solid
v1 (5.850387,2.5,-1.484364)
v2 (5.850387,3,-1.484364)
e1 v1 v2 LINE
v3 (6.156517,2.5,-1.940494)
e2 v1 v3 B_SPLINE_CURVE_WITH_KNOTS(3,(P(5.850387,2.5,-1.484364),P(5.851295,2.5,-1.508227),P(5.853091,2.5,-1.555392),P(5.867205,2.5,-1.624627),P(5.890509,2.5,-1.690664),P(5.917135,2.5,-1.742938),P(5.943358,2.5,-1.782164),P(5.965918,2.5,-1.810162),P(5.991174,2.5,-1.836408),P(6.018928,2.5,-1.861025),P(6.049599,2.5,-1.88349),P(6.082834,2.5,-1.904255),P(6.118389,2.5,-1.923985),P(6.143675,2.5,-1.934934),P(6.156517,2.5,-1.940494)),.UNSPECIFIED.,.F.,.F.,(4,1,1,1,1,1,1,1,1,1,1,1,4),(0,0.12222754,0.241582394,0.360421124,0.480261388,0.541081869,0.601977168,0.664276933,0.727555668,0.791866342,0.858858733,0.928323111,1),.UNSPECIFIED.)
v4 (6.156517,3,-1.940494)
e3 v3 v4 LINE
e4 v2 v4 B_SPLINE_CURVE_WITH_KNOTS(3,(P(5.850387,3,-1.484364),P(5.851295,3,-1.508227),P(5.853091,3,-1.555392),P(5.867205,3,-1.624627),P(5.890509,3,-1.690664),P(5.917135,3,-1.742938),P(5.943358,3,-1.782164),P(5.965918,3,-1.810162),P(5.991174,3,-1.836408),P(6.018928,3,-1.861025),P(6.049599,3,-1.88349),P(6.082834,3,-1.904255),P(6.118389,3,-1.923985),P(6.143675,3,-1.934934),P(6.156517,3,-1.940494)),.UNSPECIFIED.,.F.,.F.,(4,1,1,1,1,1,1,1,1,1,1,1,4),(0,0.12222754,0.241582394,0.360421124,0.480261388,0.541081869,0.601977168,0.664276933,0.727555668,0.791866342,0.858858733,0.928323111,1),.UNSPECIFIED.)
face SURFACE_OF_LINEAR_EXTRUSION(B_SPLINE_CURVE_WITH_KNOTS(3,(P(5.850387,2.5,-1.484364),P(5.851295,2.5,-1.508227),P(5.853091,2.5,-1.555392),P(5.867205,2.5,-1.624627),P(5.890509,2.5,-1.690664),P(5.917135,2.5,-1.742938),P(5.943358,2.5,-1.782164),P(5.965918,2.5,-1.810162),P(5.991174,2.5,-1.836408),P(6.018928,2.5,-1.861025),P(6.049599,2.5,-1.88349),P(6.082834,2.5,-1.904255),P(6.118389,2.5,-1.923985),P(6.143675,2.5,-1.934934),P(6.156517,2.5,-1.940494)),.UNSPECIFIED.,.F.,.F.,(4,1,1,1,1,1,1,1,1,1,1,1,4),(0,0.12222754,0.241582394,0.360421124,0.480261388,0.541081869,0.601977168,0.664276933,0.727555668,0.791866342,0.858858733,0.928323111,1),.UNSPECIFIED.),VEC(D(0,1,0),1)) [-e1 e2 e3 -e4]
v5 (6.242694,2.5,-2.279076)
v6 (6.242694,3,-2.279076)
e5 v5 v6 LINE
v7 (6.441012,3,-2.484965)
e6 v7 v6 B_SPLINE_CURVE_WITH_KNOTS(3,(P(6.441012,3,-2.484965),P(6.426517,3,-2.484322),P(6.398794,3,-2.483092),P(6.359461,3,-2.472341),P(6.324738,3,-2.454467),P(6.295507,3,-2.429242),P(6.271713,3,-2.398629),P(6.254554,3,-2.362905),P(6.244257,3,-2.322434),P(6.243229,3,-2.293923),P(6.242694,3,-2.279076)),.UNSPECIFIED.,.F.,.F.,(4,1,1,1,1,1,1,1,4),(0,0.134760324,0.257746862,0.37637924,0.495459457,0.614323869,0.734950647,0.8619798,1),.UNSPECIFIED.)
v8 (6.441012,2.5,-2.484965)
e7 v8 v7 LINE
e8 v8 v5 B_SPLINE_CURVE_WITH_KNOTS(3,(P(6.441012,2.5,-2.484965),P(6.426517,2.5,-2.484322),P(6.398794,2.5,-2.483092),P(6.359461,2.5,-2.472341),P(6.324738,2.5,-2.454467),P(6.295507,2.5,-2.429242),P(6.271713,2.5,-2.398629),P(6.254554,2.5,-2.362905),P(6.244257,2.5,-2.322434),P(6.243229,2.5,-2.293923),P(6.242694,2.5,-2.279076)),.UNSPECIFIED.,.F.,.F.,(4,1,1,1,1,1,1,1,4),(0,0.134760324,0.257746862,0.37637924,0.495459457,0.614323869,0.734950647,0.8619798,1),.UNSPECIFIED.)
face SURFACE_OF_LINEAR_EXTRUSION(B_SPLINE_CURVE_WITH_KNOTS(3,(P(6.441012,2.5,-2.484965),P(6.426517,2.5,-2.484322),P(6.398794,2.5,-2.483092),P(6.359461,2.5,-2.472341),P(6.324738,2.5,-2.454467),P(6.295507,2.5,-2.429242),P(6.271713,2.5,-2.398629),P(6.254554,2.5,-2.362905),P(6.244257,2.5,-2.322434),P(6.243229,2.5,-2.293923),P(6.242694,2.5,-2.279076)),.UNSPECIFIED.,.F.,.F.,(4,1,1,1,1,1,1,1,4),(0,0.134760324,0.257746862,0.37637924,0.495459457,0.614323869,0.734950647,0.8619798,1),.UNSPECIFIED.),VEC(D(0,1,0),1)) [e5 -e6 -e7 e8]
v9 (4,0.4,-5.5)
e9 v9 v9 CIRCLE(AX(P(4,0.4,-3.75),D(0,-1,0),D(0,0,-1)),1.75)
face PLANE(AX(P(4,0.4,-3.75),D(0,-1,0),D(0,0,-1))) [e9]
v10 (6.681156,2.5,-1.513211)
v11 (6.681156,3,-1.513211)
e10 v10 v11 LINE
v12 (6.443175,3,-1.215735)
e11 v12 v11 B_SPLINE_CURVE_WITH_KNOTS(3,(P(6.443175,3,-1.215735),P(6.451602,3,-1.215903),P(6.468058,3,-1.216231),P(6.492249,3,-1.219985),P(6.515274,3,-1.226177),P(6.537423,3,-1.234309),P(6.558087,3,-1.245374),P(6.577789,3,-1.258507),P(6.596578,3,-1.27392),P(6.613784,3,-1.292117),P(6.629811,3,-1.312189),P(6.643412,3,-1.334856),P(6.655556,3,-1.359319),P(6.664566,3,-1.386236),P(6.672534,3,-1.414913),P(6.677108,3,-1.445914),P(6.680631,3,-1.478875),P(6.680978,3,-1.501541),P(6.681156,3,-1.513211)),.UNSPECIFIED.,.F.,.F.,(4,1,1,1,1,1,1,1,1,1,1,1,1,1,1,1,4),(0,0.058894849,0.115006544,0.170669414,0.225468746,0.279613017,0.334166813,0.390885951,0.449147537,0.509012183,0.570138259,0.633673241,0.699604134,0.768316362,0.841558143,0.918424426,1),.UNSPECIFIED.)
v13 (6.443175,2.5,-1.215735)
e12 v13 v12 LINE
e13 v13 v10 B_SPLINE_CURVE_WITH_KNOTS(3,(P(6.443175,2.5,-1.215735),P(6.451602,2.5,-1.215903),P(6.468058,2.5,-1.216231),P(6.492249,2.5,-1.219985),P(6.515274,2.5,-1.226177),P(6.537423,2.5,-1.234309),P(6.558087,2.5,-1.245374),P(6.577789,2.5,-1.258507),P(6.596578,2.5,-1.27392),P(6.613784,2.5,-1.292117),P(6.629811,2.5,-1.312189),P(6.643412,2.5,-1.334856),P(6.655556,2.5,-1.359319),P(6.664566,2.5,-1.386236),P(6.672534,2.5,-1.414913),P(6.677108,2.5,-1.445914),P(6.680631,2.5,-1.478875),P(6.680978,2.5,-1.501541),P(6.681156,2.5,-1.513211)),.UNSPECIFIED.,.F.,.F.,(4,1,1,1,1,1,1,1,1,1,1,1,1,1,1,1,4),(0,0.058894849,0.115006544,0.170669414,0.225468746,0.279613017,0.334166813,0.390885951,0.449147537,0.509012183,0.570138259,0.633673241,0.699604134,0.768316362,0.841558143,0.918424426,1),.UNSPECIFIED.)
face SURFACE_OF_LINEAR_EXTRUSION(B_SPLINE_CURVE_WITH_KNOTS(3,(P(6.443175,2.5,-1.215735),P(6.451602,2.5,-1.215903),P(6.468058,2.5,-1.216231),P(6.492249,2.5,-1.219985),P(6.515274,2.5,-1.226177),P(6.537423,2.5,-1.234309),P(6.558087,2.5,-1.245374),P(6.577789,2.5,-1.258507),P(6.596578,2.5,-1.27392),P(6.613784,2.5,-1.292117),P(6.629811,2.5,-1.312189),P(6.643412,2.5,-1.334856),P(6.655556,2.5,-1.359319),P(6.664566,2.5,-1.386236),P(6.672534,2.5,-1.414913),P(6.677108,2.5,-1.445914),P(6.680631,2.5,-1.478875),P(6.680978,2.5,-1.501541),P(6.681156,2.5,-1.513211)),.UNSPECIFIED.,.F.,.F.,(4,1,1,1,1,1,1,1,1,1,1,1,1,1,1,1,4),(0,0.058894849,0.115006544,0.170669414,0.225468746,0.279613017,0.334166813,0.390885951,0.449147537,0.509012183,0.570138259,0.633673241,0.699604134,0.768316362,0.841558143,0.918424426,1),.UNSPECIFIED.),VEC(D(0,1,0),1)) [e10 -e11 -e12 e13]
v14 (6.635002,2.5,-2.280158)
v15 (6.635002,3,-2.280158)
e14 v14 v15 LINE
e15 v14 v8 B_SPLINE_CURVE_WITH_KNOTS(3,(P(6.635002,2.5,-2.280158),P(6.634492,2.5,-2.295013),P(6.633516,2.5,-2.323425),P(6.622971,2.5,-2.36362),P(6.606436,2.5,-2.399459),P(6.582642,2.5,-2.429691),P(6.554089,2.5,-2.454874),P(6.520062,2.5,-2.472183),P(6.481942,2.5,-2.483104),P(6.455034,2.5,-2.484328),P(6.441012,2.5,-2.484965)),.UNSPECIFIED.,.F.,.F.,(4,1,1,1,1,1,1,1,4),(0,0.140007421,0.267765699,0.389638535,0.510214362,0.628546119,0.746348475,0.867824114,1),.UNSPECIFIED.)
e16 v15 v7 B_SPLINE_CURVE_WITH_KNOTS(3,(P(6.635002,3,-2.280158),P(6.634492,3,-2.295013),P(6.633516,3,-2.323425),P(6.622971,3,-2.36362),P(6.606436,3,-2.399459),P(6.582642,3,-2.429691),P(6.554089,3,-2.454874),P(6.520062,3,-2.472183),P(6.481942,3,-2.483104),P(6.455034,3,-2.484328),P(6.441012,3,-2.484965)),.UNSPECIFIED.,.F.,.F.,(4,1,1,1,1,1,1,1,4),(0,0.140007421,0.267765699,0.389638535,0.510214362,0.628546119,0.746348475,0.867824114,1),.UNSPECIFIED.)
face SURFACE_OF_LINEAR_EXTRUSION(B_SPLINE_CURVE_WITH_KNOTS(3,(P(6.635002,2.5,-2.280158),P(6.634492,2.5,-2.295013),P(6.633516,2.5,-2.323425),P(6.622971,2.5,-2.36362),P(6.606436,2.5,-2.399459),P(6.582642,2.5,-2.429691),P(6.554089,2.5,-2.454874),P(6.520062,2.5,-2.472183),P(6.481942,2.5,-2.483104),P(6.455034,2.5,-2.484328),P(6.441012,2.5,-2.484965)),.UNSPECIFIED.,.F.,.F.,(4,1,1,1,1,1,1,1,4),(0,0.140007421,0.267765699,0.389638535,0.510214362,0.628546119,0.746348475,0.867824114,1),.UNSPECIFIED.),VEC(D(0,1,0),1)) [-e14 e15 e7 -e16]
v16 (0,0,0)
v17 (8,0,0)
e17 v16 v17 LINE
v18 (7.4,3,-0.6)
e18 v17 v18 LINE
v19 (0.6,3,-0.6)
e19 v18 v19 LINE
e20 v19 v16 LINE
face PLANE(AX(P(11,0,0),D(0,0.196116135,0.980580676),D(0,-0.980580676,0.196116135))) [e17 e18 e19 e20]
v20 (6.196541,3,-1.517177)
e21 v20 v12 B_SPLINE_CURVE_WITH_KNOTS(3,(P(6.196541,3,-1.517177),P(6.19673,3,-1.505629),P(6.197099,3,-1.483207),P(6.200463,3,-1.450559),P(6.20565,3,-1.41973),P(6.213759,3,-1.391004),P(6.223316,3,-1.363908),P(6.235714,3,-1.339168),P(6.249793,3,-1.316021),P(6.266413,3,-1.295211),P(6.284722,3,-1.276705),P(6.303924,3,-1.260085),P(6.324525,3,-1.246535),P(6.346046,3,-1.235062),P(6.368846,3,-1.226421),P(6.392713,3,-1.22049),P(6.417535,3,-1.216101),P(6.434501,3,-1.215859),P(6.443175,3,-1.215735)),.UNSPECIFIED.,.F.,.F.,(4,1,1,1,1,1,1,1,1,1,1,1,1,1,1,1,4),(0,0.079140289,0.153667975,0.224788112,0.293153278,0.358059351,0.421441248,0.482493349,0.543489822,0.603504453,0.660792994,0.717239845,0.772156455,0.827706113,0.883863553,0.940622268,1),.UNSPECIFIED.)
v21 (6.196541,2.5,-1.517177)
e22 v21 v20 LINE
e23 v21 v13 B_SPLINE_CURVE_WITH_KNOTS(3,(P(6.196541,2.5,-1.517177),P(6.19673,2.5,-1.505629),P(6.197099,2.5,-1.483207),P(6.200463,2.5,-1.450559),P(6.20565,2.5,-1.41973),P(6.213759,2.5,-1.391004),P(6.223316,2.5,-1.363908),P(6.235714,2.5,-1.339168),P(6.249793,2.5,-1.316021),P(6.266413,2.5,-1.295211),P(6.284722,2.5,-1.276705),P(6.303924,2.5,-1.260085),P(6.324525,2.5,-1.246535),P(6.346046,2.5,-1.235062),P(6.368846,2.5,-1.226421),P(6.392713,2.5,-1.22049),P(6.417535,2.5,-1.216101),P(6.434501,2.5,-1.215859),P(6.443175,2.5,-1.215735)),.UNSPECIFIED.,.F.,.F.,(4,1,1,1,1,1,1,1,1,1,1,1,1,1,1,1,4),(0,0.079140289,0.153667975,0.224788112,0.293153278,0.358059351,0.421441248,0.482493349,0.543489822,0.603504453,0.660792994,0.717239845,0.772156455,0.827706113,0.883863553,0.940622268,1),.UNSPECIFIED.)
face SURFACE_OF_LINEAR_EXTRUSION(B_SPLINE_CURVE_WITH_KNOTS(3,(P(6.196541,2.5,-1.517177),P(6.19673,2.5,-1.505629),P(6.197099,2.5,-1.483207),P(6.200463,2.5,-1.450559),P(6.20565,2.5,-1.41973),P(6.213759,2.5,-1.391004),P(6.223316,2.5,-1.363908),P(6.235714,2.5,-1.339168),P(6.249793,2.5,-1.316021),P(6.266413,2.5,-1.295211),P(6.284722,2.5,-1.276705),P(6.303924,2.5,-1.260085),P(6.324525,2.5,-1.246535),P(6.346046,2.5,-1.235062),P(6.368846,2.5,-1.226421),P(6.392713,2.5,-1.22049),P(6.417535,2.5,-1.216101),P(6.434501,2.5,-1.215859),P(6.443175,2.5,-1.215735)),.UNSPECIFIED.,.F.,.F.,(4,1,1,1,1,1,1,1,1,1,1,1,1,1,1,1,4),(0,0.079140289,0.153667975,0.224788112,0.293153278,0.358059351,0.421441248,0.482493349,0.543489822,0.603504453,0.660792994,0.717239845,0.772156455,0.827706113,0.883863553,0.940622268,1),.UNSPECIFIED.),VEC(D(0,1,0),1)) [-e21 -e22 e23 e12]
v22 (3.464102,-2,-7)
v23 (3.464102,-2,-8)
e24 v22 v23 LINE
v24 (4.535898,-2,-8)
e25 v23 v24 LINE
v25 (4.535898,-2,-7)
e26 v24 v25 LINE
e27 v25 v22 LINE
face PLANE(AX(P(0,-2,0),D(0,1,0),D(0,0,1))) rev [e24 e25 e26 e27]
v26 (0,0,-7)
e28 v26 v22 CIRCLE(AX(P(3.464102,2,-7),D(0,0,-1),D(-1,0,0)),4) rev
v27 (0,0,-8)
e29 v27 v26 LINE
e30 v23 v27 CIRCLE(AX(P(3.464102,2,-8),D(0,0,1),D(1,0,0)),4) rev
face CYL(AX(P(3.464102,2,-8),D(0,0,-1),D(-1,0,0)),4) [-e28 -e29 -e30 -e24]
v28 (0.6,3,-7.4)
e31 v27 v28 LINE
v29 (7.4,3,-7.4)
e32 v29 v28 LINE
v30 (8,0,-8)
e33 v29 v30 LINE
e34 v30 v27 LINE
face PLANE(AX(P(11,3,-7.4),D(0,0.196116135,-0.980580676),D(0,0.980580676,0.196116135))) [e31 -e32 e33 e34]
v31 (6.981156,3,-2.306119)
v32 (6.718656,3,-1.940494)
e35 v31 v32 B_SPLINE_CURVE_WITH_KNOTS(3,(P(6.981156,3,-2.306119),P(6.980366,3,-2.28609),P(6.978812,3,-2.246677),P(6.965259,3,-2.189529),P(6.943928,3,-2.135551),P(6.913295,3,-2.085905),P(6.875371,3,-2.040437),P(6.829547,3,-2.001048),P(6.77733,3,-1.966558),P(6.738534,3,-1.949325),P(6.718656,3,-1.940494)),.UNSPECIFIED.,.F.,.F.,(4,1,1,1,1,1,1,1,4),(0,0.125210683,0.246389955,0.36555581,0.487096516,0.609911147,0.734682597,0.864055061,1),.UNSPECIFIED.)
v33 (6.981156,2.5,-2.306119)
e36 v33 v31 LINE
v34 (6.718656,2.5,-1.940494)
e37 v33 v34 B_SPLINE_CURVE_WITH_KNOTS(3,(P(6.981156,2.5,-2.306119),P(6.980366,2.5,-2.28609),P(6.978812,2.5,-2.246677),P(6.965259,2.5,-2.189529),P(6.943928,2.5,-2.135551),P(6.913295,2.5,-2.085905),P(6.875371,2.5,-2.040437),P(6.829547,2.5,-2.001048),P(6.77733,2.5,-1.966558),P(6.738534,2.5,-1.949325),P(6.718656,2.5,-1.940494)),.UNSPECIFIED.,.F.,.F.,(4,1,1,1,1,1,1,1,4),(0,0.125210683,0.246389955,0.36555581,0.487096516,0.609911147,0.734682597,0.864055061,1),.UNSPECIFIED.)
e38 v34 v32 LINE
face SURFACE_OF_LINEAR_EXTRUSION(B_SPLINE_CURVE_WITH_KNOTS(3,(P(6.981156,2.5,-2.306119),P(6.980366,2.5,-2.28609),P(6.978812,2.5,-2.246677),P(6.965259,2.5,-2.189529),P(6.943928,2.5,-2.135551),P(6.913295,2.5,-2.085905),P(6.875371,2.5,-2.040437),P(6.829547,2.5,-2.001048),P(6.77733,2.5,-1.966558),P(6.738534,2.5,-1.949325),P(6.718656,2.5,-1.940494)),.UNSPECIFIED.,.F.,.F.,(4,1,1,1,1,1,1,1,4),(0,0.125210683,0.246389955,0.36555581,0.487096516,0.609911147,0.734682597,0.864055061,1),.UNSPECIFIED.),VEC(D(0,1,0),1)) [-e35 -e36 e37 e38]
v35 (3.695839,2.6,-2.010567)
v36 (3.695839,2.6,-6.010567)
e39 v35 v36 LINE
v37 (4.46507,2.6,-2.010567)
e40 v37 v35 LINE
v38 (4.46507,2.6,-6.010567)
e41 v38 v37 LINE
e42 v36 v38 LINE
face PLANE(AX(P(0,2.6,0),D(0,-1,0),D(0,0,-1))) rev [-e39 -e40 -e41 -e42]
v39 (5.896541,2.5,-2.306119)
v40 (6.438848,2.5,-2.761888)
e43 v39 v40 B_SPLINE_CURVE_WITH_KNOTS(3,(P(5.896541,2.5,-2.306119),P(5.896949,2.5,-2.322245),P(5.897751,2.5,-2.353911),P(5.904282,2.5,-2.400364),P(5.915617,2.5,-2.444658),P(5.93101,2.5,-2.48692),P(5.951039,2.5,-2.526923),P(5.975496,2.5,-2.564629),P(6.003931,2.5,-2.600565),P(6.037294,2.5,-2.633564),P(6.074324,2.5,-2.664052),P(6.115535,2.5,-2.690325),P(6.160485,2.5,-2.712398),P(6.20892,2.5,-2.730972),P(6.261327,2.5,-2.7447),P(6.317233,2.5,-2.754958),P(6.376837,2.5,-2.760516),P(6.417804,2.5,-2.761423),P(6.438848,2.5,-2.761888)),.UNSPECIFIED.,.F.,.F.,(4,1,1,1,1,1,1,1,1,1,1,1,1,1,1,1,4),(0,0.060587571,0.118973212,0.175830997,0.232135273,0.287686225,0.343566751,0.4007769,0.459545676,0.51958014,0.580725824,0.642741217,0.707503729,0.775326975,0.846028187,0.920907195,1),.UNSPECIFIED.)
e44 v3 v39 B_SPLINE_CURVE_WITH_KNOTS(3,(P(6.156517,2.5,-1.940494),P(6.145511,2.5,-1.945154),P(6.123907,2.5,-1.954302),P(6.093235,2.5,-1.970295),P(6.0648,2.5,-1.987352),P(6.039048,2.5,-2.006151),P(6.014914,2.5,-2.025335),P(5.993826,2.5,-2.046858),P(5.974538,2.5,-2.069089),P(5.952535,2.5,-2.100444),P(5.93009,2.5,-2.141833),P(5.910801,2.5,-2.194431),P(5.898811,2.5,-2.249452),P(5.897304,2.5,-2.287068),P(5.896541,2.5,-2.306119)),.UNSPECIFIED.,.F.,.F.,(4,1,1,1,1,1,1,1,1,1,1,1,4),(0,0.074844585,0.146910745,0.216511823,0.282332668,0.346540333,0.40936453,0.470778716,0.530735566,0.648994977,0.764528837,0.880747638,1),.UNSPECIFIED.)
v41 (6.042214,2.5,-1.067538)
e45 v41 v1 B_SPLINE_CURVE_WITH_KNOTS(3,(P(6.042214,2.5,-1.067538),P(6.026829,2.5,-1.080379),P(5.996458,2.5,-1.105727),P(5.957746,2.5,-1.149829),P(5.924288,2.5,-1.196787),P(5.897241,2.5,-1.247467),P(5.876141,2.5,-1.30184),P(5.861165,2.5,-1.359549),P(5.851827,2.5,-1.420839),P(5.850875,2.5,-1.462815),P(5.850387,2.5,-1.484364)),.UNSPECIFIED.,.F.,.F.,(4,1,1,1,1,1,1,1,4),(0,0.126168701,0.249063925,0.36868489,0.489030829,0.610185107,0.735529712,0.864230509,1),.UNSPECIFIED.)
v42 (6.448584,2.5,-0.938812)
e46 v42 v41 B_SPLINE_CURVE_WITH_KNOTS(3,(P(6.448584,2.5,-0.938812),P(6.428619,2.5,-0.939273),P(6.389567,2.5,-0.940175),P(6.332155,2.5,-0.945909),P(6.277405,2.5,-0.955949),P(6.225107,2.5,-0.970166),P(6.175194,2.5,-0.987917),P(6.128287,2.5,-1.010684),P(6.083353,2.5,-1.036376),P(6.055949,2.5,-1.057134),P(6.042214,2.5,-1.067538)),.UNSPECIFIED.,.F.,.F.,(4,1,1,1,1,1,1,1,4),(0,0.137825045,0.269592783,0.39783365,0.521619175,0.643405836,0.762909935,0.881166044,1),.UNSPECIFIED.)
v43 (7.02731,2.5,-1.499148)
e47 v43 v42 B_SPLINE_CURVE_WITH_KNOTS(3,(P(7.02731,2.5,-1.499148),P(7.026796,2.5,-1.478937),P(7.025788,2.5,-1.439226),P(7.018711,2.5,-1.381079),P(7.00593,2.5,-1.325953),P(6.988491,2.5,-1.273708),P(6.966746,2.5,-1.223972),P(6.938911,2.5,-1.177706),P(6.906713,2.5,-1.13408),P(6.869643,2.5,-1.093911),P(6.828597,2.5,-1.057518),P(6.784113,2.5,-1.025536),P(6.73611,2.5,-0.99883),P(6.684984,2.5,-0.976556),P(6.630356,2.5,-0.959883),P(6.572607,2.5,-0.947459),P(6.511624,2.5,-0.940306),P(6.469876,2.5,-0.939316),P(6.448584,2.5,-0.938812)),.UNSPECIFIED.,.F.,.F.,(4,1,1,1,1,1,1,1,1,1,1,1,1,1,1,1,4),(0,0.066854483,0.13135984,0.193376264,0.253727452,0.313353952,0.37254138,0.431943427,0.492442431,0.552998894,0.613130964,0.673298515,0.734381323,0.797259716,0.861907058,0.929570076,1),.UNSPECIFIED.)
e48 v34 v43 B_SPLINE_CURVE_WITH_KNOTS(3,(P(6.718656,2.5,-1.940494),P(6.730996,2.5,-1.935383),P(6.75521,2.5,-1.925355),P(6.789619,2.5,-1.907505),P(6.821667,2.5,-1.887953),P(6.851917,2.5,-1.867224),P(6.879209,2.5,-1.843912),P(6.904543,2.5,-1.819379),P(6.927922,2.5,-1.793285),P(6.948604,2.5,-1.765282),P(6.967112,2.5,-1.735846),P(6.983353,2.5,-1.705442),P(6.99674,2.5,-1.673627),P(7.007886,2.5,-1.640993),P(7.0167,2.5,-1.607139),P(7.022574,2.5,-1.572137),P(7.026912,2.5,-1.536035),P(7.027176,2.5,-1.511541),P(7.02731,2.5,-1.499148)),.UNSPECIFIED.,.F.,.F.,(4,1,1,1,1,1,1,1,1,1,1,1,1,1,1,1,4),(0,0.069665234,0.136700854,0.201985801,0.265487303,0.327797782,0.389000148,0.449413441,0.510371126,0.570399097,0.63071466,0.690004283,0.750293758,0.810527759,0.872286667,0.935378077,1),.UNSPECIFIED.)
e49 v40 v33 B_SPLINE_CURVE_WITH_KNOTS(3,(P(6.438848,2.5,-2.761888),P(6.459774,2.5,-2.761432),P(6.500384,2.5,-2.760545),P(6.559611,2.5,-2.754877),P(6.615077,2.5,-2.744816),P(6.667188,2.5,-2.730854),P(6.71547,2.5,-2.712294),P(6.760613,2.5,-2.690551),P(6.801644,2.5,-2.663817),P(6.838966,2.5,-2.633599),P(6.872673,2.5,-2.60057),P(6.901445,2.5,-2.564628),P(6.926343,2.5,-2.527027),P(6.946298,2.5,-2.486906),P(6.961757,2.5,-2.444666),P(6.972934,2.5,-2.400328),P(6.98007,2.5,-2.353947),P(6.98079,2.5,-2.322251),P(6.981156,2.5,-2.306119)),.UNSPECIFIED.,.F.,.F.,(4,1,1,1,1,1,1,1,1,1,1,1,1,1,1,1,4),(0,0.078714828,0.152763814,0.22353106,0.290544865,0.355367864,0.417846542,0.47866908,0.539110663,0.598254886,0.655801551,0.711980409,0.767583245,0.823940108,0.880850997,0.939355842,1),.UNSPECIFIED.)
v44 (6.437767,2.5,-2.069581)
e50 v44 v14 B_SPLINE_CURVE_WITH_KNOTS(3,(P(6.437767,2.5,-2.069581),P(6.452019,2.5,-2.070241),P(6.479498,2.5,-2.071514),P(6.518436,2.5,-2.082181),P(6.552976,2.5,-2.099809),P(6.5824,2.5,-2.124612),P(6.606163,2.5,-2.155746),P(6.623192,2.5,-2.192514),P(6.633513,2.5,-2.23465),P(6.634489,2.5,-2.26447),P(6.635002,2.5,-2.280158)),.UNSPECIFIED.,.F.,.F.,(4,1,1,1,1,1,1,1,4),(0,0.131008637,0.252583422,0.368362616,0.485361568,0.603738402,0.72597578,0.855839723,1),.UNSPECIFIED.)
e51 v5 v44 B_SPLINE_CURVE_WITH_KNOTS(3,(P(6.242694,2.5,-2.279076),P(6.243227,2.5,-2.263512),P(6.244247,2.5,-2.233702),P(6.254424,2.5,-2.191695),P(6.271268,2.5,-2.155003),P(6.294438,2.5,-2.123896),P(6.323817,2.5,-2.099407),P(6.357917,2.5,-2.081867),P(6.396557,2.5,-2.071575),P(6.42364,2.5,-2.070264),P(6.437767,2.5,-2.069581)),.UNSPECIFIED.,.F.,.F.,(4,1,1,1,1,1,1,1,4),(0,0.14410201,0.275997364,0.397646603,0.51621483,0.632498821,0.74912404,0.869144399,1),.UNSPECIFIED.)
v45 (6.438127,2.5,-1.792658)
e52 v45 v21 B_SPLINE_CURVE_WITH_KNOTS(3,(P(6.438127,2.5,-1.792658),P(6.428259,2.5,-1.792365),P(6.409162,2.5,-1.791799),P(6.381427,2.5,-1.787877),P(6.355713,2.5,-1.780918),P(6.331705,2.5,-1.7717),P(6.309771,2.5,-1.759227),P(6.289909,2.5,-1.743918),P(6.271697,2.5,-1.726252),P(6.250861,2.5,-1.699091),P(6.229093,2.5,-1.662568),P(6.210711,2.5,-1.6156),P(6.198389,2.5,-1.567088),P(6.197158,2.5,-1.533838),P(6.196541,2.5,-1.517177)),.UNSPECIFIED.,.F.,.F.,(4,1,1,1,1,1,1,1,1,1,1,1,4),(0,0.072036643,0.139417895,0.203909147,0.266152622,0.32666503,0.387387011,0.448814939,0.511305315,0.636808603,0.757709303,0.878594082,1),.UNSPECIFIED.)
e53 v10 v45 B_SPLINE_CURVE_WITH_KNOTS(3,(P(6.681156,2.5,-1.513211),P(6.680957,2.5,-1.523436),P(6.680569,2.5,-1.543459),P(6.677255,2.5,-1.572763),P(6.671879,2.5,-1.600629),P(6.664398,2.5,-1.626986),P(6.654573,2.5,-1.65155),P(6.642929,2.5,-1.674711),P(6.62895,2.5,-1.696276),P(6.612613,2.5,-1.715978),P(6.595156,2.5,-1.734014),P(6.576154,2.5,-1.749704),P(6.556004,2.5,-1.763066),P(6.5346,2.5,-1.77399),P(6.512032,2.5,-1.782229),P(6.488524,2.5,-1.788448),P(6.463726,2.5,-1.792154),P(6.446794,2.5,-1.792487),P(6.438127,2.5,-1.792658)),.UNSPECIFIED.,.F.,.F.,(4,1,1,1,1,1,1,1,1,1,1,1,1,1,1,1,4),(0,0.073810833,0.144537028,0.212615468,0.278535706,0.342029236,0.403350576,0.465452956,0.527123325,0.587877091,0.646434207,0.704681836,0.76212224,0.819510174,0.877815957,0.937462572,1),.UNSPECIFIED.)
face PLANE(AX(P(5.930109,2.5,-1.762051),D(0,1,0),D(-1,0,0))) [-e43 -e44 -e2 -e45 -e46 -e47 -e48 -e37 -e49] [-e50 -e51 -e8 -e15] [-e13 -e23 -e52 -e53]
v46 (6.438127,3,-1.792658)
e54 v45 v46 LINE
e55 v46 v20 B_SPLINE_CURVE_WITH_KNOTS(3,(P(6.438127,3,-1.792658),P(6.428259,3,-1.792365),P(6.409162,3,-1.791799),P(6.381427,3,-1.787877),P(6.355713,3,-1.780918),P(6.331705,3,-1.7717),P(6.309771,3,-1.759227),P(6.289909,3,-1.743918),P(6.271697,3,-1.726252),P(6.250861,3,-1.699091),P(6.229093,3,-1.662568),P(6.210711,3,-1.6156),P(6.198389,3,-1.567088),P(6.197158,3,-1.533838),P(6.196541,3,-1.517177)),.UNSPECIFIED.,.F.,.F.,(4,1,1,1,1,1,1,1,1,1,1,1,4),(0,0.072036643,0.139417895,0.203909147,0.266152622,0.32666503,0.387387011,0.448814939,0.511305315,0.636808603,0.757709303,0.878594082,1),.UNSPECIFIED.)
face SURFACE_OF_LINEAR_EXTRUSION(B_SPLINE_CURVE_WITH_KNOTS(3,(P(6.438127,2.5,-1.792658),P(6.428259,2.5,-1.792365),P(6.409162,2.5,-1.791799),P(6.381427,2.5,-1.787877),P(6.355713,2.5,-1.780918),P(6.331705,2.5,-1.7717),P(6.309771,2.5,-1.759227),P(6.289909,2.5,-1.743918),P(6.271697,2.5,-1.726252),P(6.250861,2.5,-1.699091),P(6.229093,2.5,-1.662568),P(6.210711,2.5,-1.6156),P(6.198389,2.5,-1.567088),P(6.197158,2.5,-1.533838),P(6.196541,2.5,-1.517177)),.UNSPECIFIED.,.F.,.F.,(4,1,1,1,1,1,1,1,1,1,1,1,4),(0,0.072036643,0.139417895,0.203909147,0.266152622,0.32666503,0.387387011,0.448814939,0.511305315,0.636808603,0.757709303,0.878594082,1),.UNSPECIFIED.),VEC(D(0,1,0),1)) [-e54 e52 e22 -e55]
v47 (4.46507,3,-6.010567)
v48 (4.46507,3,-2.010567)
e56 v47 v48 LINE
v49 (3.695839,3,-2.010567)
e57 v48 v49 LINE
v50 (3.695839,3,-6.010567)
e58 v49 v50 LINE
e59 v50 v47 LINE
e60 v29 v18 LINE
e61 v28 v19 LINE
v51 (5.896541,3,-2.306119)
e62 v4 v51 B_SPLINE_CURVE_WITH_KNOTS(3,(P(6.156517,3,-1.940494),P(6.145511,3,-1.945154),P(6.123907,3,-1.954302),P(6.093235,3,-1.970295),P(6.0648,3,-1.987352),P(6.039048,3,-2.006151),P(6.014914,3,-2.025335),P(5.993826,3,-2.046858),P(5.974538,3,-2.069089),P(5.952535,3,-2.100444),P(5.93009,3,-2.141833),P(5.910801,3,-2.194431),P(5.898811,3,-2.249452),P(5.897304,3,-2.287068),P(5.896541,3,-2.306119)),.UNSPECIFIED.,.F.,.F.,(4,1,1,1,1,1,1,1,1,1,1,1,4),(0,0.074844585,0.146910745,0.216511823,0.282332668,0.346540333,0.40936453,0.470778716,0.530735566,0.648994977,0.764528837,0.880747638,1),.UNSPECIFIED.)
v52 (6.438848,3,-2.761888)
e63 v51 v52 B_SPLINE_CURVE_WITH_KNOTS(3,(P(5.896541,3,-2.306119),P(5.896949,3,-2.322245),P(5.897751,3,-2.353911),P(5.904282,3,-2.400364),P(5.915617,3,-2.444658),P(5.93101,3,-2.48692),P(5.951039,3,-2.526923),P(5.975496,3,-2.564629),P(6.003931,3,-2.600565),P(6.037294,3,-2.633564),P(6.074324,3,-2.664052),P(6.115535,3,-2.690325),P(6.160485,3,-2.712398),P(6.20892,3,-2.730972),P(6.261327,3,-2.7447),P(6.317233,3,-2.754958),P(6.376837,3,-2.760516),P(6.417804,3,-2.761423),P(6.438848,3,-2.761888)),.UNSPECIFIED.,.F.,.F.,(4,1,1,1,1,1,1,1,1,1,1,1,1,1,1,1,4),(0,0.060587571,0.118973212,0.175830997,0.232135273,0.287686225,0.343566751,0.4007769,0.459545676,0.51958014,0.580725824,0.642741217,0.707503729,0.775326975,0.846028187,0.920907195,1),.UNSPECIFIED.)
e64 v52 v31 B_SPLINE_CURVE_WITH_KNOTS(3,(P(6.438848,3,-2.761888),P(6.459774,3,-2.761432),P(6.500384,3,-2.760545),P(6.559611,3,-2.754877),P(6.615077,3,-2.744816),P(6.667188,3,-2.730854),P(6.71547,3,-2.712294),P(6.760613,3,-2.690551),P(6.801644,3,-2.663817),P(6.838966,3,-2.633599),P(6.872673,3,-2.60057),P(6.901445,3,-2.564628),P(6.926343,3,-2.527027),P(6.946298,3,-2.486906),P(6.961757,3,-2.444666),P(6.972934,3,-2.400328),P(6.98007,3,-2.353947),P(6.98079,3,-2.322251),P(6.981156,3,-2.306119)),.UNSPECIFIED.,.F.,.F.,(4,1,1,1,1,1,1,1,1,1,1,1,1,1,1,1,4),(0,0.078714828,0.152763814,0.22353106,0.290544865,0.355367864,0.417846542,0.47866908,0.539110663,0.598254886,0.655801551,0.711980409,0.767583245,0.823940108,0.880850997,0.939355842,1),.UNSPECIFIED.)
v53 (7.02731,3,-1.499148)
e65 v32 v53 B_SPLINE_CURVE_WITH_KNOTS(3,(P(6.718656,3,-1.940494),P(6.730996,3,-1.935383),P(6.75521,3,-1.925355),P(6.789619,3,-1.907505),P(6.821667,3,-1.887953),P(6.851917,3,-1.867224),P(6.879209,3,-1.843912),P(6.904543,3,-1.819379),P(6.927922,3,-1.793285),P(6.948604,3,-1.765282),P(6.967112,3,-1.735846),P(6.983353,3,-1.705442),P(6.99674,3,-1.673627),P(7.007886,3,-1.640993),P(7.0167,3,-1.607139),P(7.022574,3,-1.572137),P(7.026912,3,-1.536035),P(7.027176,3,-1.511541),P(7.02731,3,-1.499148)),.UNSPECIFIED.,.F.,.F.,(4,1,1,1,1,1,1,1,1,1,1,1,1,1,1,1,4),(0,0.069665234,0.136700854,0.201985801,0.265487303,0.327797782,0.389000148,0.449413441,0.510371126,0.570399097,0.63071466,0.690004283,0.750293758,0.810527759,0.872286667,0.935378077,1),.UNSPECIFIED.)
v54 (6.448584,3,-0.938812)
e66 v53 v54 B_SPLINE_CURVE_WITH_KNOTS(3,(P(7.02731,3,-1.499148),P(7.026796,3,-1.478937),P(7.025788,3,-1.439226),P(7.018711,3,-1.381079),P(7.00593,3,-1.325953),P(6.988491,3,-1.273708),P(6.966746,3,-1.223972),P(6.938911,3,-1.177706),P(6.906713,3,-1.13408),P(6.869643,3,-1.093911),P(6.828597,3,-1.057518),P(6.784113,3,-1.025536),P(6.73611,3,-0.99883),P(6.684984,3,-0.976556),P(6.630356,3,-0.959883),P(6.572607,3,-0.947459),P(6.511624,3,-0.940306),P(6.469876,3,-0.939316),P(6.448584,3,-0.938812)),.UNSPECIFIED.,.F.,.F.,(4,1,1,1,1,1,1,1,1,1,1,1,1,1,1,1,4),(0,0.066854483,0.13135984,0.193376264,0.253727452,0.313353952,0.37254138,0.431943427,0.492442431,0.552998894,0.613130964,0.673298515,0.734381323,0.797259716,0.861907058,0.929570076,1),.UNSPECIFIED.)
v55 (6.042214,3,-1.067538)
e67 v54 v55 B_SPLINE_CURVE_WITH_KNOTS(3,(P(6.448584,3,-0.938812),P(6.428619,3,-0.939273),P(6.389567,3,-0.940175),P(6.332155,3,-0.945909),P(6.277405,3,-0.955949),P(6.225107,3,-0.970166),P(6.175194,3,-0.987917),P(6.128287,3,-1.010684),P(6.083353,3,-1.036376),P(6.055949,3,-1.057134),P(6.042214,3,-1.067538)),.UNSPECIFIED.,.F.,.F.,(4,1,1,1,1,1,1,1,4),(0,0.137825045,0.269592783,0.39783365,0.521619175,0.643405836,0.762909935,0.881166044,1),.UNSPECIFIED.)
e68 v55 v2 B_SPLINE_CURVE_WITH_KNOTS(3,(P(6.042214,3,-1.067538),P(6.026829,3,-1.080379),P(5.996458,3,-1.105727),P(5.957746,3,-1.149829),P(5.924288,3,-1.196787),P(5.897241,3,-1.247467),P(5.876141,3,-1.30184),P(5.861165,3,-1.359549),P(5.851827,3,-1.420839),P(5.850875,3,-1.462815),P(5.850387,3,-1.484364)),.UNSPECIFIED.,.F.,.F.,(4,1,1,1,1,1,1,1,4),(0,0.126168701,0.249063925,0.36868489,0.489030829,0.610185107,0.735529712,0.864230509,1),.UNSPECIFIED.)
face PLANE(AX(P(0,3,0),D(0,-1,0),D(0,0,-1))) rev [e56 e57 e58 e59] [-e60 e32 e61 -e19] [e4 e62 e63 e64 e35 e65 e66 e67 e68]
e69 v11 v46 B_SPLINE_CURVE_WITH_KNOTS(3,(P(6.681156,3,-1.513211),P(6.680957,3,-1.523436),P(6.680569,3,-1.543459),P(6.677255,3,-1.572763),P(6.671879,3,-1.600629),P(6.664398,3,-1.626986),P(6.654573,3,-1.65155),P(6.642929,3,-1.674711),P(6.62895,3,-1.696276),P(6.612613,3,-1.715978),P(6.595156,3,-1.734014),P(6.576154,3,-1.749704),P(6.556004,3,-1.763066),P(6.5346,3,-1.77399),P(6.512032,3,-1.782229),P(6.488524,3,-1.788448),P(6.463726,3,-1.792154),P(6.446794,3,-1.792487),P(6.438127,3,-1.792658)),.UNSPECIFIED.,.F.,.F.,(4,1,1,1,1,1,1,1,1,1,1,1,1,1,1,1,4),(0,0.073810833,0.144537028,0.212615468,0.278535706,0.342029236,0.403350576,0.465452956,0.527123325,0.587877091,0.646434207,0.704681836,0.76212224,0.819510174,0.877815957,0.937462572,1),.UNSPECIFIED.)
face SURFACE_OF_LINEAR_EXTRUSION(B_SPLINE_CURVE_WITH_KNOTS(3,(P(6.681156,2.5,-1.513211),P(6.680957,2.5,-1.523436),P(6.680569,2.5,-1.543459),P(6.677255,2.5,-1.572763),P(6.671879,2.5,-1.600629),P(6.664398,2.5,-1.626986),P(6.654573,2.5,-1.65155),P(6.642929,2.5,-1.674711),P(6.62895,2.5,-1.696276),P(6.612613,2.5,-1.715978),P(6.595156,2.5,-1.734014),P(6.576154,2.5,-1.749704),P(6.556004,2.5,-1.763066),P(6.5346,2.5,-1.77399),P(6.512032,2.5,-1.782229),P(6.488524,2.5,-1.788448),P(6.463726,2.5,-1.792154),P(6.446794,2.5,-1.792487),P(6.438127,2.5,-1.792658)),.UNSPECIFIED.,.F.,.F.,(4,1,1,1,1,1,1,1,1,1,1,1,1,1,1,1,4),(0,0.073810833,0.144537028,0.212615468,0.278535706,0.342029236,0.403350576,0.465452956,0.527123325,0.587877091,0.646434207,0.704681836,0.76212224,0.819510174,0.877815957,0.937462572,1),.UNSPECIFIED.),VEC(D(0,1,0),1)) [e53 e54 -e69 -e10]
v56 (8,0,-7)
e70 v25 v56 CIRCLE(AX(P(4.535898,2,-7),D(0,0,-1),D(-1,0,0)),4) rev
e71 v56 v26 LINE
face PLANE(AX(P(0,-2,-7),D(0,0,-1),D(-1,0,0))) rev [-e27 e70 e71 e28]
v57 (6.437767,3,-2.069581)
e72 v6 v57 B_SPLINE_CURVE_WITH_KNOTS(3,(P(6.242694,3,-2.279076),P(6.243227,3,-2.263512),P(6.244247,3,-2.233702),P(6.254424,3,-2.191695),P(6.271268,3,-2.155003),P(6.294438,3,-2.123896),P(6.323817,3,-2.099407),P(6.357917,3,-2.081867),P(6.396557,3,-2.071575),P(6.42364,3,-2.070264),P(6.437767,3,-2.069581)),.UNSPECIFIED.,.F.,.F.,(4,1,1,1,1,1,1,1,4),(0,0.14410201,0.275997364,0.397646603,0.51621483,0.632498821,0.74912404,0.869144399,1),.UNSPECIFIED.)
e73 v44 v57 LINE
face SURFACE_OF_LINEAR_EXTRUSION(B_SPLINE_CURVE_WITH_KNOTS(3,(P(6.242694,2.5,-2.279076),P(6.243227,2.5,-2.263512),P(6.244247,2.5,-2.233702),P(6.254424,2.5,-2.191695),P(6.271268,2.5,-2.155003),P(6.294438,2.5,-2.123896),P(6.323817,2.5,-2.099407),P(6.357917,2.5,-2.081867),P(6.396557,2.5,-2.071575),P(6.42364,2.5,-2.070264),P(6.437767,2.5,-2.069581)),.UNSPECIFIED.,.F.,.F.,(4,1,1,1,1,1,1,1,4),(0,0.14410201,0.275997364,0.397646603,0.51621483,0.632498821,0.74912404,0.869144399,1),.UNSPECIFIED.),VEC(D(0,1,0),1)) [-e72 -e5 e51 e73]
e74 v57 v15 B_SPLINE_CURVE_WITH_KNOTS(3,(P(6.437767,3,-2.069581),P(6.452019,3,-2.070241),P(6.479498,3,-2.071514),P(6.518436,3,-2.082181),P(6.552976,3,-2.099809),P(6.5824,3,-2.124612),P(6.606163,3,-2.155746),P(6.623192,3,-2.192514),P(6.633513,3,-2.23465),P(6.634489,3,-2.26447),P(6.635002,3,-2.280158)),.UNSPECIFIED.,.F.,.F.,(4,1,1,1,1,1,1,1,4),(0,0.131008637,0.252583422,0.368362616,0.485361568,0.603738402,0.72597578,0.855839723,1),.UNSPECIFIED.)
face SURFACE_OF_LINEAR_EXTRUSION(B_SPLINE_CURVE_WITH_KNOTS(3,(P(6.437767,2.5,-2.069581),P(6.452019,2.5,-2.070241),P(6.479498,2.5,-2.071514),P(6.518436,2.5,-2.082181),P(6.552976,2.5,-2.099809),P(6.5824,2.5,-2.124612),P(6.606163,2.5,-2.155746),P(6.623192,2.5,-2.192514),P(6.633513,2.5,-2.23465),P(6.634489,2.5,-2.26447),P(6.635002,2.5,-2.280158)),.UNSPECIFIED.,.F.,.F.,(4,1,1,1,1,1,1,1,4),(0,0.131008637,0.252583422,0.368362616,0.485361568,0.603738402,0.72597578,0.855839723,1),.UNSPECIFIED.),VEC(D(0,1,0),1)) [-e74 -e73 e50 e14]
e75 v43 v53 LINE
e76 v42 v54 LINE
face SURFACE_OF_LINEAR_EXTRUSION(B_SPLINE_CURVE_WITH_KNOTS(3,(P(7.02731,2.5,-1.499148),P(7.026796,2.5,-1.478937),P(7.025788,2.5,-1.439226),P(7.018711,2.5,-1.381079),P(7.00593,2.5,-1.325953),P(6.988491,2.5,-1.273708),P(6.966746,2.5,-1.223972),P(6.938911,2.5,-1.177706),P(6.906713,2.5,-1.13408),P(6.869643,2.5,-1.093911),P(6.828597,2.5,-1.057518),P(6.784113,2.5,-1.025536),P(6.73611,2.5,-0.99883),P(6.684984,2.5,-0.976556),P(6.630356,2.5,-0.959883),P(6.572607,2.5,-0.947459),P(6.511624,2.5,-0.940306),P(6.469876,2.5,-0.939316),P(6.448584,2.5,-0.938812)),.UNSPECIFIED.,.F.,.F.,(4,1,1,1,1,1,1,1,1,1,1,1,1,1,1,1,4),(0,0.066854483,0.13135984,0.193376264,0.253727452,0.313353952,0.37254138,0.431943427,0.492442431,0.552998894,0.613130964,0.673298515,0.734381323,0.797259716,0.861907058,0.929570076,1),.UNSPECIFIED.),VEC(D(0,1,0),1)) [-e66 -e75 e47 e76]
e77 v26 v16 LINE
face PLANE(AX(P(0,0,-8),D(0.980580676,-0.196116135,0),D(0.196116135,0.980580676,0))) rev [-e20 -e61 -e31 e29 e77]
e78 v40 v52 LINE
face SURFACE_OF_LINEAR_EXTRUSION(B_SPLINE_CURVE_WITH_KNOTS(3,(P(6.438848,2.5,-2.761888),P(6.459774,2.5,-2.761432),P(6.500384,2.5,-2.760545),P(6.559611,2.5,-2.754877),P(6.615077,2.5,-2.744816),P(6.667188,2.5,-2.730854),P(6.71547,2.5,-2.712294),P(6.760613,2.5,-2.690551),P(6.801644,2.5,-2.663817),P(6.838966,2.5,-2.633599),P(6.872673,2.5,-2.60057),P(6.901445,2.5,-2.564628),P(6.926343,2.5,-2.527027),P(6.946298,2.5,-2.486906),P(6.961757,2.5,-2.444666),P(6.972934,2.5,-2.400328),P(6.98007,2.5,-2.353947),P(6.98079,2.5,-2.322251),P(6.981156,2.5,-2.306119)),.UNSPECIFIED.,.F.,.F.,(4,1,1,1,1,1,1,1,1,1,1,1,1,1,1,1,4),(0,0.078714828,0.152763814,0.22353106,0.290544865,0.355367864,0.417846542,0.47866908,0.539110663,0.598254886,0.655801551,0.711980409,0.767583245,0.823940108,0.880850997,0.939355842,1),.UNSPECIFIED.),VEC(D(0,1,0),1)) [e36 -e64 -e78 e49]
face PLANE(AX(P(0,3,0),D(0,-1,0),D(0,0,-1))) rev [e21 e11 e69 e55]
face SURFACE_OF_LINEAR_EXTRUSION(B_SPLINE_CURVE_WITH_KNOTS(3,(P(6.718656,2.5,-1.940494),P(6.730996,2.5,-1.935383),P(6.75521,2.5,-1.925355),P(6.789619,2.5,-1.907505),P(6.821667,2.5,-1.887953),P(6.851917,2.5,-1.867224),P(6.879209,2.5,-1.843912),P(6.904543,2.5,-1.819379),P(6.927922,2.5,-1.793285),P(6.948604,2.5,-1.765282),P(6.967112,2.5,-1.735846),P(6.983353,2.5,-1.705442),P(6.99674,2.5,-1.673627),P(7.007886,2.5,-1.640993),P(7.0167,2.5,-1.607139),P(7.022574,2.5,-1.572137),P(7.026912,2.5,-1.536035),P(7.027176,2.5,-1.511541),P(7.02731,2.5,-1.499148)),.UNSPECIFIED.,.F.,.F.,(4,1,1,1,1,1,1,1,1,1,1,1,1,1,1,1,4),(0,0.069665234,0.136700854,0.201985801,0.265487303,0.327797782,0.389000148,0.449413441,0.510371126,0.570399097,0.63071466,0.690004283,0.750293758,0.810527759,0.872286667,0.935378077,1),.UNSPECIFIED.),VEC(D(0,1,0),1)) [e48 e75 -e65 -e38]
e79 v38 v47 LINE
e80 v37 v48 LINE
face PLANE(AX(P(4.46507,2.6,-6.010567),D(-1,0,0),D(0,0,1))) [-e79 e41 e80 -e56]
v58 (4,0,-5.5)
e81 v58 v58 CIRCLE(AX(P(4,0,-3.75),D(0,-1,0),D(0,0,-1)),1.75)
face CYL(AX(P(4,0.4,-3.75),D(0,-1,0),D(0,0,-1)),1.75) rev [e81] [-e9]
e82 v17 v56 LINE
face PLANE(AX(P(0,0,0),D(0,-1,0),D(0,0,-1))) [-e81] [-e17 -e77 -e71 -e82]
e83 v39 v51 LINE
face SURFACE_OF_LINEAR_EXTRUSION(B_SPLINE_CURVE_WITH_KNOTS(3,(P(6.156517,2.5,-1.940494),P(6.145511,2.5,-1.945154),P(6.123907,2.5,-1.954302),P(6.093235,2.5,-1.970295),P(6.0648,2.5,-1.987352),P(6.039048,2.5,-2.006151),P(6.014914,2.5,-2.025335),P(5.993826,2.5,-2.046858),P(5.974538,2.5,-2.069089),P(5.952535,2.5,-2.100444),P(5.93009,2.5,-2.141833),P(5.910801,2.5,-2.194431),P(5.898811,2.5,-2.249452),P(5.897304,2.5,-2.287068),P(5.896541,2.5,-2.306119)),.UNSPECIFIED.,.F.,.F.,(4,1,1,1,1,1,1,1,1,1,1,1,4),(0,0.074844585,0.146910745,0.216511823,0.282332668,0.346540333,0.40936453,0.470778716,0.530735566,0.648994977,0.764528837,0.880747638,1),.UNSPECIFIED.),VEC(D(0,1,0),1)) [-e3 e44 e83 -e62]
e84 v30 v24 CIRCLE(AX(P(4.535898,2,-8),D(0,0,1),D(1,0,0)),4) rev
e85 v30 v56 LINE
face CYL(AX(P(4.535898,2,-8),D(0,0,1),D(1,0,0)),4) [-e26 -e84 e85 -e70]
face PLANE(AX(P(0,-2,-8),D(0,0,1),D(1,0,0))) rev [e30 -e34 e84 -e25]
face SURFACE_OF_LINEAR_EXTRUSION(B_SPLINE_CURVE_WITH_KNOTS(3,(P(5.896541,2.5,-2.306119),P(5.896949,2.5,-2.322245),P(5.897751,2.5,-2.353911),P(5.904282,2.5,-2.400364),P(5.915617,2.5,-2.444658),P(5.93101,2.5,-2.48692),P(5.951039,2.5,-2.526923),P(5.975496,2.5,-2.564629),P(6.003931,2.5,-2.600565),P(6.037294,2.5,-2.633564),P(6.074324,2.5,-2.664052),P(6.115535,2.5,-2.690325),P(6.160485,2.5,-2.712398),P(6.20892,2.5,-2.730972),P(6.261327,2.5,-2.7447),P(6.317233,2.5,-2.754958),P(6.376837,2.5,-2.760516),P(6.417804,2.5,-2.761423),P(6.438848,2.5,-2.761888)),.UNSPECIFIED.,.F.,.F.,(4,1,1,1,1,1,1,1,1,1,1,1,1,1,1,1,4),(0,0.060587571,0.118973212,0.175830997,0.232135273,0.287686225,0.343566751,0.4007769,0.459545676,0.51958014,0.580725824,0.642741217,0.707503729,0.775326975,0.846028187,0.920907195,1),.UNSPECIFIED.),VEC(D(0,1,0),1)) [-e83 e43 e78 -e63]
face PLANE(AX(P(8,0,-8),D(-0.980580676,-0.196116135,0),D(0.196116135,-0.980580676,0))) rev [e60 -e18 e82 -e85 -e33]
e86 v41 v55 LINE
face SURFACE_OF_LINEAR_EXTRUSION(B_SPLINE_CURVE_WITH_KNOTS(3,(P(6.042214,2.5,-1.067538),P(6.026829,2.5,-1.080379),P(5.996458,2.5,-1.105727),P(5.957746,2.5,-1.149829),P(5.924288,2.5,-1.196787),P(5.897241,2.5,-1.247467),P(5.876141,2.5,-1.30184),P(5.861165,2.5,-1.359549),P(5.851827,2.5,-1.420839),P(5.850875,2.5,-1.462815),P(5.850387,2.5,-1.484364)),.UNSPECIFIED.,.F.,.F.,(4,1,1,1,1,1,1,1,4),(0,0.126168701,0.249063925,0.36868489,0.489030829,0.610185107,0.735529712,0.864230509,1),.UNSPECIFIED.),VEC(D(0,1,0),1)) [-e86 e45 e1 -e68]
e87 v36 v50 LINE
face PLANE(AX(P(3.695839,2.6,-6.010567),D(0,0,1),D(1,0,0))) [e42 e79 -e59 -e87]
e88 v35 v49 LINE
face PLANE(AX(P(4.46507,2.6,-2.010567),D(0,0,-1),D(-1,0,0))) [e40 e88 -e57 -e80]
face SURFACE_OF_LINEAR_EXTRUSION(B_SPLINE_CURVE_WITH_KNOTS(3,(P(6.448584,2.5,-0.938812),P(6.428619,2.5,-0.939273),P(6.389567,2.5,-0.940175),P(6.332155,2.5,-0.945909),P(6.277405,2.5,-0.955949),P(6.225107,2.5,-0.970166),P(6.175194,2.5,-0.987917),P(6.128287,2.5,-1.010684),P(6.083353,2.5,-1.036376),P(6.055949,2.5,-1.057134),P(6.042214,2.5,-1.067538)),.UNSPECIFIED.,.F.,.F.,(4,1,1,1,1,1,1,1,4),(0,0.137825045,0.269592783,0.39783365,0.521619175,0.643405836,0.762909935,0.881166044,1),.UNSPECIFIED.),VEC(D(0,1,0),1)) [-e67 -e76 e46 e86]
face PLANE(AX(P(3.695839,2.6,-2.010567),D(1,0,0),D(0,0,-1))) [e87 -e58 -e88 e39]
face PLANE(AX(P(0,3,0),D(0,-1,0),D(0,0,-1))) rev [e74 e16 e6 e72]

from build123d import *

# Parameters (mm, degrees)
SKETCH1_W               = 8
SKETCH1_H               = 8
BOSS_EXTRUDE1_DEPTH     = 3
CUT_EXTRUDE1_DEPTH      = 12.704699911
CUT_EXTRUDE1_DEPTH_BACK = 12.704699911
CUT_EXTRUDE2_DEPTH      = 11
SKETCH4_R               = 1.75
CUT_EXTRUDE3_DEPTH      = 0.4
SKETCH5_W               = 8
SKETCH5_H               = 1
BOSS_EXTRUDE2_DEPTH     = 2
FILLET1_R               = 4
SKETCH6_W               = 0.769230769
SKETCH6_H               = 4
CUT_EXTRUDE4_DEPTH      = 0.4
CUT_EXTRUDE5_DEPTH      = 0.5


with BuildPart() as part:
    # Sketch1 → Boss-Extrude1 (new body)
    with BuildSketch(Plane(origin=(0, 0, 0), x_dir=(1, 0, 0), z_dir=(0, 1, 0))):
        with Locations((4, 4)):
            Rectangle(SKETCH1_W, SKETCH1_H)
    extrude(amount=BOSS_EXTRUDE1_DEPTH)

    # Sketch2 → Cut-Extrude1 (cut, two sides: drawn at the far end of the back side and taken through both)
    with BuildSketch(Plane.XY.offset(-CUT_EXTRUDE1_DEPTH_BACK)):
        Polygon((0, 0), (0.6, 3), (0, 3), align=None)
        Polygon((8, 0), (7.4, 3), (8, 3), align=None)
    extrude(amount=CUT_EXTRUDE1_DEPTH + CUT_EXTRUDE1_DEPTH_BACK, mode=Mode.SUBTRACT)

    # Sketch3 → Cut-Extrude2 (cut)
    with BuildSketch(Plane(origin=(0, 0, 0), x_dir=(0, 0, -1), z_dir=(1, 0, 0))):
        Polygon((0, 0), (0.6, 3), (0, 3), align=None)
        Polygon((8, 3), (7.4, 3), (8, 0), align=None)
    extrude(amount=CUT_EXTRUDE2_DEPTH, mode=Mode.SUBTRACT)

    # Sketch4 → Cut-Extrude3 (cut)
    with BuildSketch(Plane.XZ):
        with Locations(Location((4, -3.75, 0), (0, 0, 270))):
            Circle(SKETCH4_R)
    extrude(amount=-CUT_EXTRUDE3_DEPTH, mode=Mode.SUBTRACT)

    # Sketch5 → Boss-Extrude2 (add)
    with BuildSketch(Plane.XZ):
        with Locations((4, -7.5)):
            Rectangle(SKETCH5_W, SKETCH5_H)
    extrude(amount=BOSS_EXTRUDE2_DEPTH)

    # Fillet1
    # the kernel refuses this fillet: 4 mm, written as the material it takes off along each edge
    with BuildSketch(Plane(origin=(8, -2, -16.660254038), x_dir=(0, 1, 0), z_dir=(0, 0, 1)), Plane(origin=(0, -2, 1.660254038), x_dir=(0, 1, 0), z_dir=(0, 0, -1))) as fillet1_piece_1:
        with BuildLine():
            CenterArc((4, 3.464101615), FILLET1_R, 180, 60)
            Line((0, 3.464101615), (-0.08, 3.464101615))
            Line((-0.08, 3.464101615), (-0.08, 0))
            Line((-0.08, 0), (0, -0.08))
            ThreePointArc((0, -0.08), (1, -0.08), (1.96, -0.069282032))
            Line((1.96, -0.069282032), (2, 0))
        make_face()
    extrude(amount=18.320508076, mode=Mode.SUBTRACT)

    # Sketch6 → Cut-Extrude4 (cut)
    with BuildSketch(Plane(origin=(0, 3, 0), x_dir=(1, 0, 0), z_dir=(0, 1, 0))):
        with Locations((4.080454652, 4.010567225)):
            Rectangle(SKETCH6_W, SKETCH6_H)
    extrude(amount=-CUT_EXTRUDE4_DEPTH, mode=Mode.SUBTRACT)

    # Sketch7 → Cut-Extrude5 (cut)
    with BuildSketch(Plane(origin=(0, 3, 0), x_dir=(1, 0, 0), z_dir=(0, 1, 0))):
        with BuildLine():
            add(Edge.make_bspline(
                [(6.15651658, 1.940494244), (6.145510655, 1.945154492), (6.123907371, 1.954301988), (6.09323484, 1.970294914), (6.064799566, 1.987351514), (6.03904827, 2.006151328), (6.014913928, 2.025334971), (5.993825771, 2.046858093), (5.974537605, 2.069089397), (5.952535222, 2.100444232), (5.930090229, 2.141832976), (5.910800925, 2.194430822), (5.898811147, 2.249451533), (5.897303934, 2.287068468), (5.896540619, 2.306119244)],
                knots=[0, 0, 0, 0, 0.898135024, 1.762928937, 2.598141881, 3.387992021, 4.158483993, 4.912374357, 5.649344587, 6.368826796, 7.78793972, 9.174346042, 10.568971657, 12, 12, 12, 12], degree=3))
            add(Edge.make_bspline(
                [(5.896540619, 2.306119244), (5.896949128, 2.322245314), (5.897751301, 2.353911386), (5.904281857, 2.400363734), (5.915616882, 2.44465812), (5.931010165, 2.486919818), (5.951038649, 2.526923073), (5.975496438, 2.56462901), (6.003930921, 2.600564872), (6.037294343, 2.633564085), (6.074323927, 2.664052327), (6.115534703, 2.69032529), (6.160485402, 2.712397947), (6.20891965, 2.730972479), (6.261326587, 2.744700346), (6.31723261, 2.754957515), (6.376837021, 2.760515608), (6.417804161, 2.761422579), (6.438848311, 2.761888475)],
                knots=[0, 0, 0, 0, 0.969401132, 1.903571386, 2.813295953, 3.714164367, 4.602979607, 5.497068024, 6.412430398, 7.352730811, 8.313282239, 9.291613189, 10.283859467, 11.320059661, 12.405231593, 13.536450991, 14.734515125, 16, 16, 16, 16], degree=3))
            add(Edge.make_bspline(
                [(6.438848311, 2.761888475), (6.459773562, 2.761431674), (6.500383715, 2.760545149), (6.55961144, 2.754877249), (6.615077261, 2.744816374), (6.667188187, 2.730854406), (6.715469625, 2.712293645), (6.760612767, 2.690551265), (6.801644432, 2.66381705), (6.838966437, 2.633598573), (6.872672652, 2.600569648), (6.901445211, 2.564628122), (6.926343213, 2.527027151), (6.946297666, 2.486906382), (6.961756812, 2.444666111), (6.972933798, 2.400328314), (6.980070192, 2.353946909), (6.98078976, 2.322251495), (6.981156004, 2.306119244)],
                knots=[0, 0, 0, 0, 1.259437241, 2.444221022, 3.576496957, 4.648717845, 5.68588583, 6.685544666, 7.658705287, 8.625770615, 9.572078176, 10.492824823, 11.391686538, 12.281331915, 13.183041723, 14.093615956, 15.029693465, 16, 16, 16, 16], degree=3))
            add(Edge.make_bspline(
                [(6.981156004, 2.306119244), (6.980366305, 2.286090338), (6.978812332, 2.246677396), (6.965258975, 2.189529308), (6.943928318, 2.135551364), (6.913295241, 2.085904697), (6.875370779, 2.040437046), (6.829547075, 2.001047886), (6.777330344, 1.966558185), (6.738534469, 1.949324529), (6.718656004, 1.940494244)],
                knots=[0, 0, 0, 0, 1.001685467, 1.971119642, 2.924446479, 3.896772127, 4.879289176, 5.877460772, 6.912440485, 8, 8, 8, 8], degree=3))
            add(Edge.make_bspline(
                [(6.718656004, 1.940494244), (6.730995791, 1.935383384), (6.755209584, 1.92535458), (6.789618906, 1.907504981), (6.821666519, 1.887953149), (6.85191654, 1.867223707), (6.879208616, 1.843911559), (6.904542812, 1.819378981), (6.927921941, 1.793284607), (6.948603911, 1.76528217), (6.967111811, 1.735846397), (6.983352513, 1.705442361), (6.996740217, 1.673626651), (7.007885734, 1.640992504), (7.016699849, 1.607138887), (7.022574215, 1.572136793), (7.026912363, 1.536034577), (7.0271763, 1.511541428), (7.02730985, 1.49914809)],
                knots=[0, 0, 0, 0, 1.114643742, 2.187213659, 3.231772812, 4.247796845, 5.244764516, 6.224002375, 7.19061506, 8.165938012, 9.126385546, 10.091434554, 11.040068535, 12.004700134, 12.968444139, 13.956586669, 14.966049226, 16, 16, 16, 16], degree=3))
            add(Edge.make_bspline(
                [(7.02730985, 1.49914809), (7.026796446, 1.478937492), (7.025787679, 1.439226454), (7.018711219, 1.38107925), (7.005929874, 1.325952641), (6.988491467, 1.273708162), (6.966746481, 1.223971877), (6.938910841, 1.177706145), (6.906713253, 1.134080082), (6.869643217, 1.093910629), (6.828597293, 1.057517999), (6.784112626, 1.025535606), (6.736110057, 0.99883009), (6.684984255, 0.976556488), (6.630355755, 0.95988295), (6.572607046, 0.947459175), (6.511624372, 0.940305747), (6.469876213, 0.939316226), (6.448583888, 0.938811552)],
                knots=[0, 0, 0, 0, 1.069671731, 2.10175744, 3.09402022, 4.059639235, 5.013663234, 5.960662081, 6.911094837, 7.879078902, 8.847982309, 9.810095429, 10.772776236, 11.750101161, 12.756155452, 13.790512928, 14.873121219, 16, 16, 16, 16], degree=3))
            add(Edge.make_bspline(
                [(6.448583888, 0.938811552), (6.428619193, 0.939272791), (6.389567235, 0.940174998), (6.332155248, 0.945908933), (6.277405474, 0.955949195), (6.225107083, 0.970165993), (6.175193963, 0.987917291), (6.128286945, 1.010684294), (6.083352924, 1.036376334), (6.055949035, 1.05713359), (6.042213696, 1.067537513)],
                knots=[0, 0, 0, 0, 1.102600357, 2.156742264, 3.182669202, 4.172953404, 5.147246686, 6.10327948, 7.049328352, 8, 8, 8, 8], degree=3))
            add(Edge.make_bspline(
                [(6.042213696, 1.067537513), (6.026828749, 1.080378521), (5.996458022, 1.105727373), (5.957746472, 1.14982945), (5.924287717, 1.196787263), (5.897240595, 1.247466884), (5.876140917, 1.301840234), (5.861164702, 1.359548786), (5.851827258, 1.420839433), (5.850875415, 1.46281546), (5.850386773, 1.484364436)],
                knots=[0, 0, 0, 0, 1.009349607, 1.992511403, 2.949479119, 3.912246635, 4.881480856, 5.884237694, 6.913844069, 8, 8, 8, 8], degree=3))
            add(Edge.make_bspline(
                [(5.850386773, 1.484364436), (5.851295235, 1.508227217), (5.853090808, 1.555391937), (5.867205324, 1.624626505), (5.890509398, 1.690664462), (5.91713497, 1.74293756), (5.943357572, 1.782163786), (5.96591762, 1.810161528), (5.991173615, 1.836408274), (6.018927817, 1.861025046), (6.049598606, 1.883490474), (6.082833606, 1.904254883), (6.118388609, 1.923985052), (6.143675127, 1.934933969), (6.15651658, 1.940494244)],
                knots=[0, 0, 0, 0, 1.466730477, 2.898988729, 4.325053486, 5.763136659, 6.492982434, 7.22372602, 7.971323195, 8.73066801, 9.502396106, 10.306304791, 11.139877329, 12, 12, 12, 12], degree=3))
        make_face()
        with BuildLine():
            add(Edge.make_bspline(
                [(6.242694465, 2.279075975), (6.243227056, 2.263511707), (6.244247122, 2.233701597), (6.254423757, 2.191695088), (6.271267591, 2.155002663), (6.294437582, 2.123896005), (6.323817487, 2.099406734), (6.357917342, 2.081867293), (6.396556715, 2.071574989), (6.423640052, 2.070264386), (6.43776658, 2.069580783)],
                knots=[0, 0, 0, 0, 1.15281608, 2.207978909, 3.181172827, 4.129718639, 5.059990565, 5.992992319, 6.953155196, 8, 8, 8, 8], degree=3))
            add(Edge.make_bspline(
                [(6.43776658, 2.069580783), (6.452019198, 2.070240913), (6.479498112, 2.071513639), (6.518435607, 2.08218095), (6.552976359, 2.099808827), (6.582400264, 2.12461233), (6.606163254, 2.155745627), (6.623191809, 2.192513664), (6.633513276, 2.234649719), (6.634488897, 2.264469788), (6.635002157, 2.280157706)],
                knots=[0, 0, 0, 0, 1.048069097, 2.020667378, 2.946900928, 3.882892544, 4.829907216, 5.807806237, 6.846717784, 8, 8, 8, 8], degree=3))
            add(Edge.make_bspline(
                [(6.635002157, 2.280157706), (6.634491926, 2.295013238), (6.633516102, 2.323424602), (6.622970742, 2.363619613), (6.606436408, 2.39945922), (6.582642474, 2.429691049), (6.554089388, 2.454874147), (6.520061906, 2.472182505), (6.481941896, 2.483104081), (6.455033522, 2.484327752), (6.441011773, 2.484965398)],
                knots=[0, 0, 0, 0, 1.120059371, 2.14212559, 3.117108277, 4.081714894, 5.028368956, 5.970787798, 6.942592912, 8, 8, 8, 8], degree=3))
            add(Edge.make_bspline(
                [(6.441011773, 2.484965398), (6.426516896, 2.484322219), (6.398793536, 2.483092056), (6.359460666, 2.472341434), (6.324738063, 2.454466675), (6.295507469, 2.429242148), (6.271712994, 2.39862944), (6.254554233, 2.362905047), (6.244256622, 2.322433946), (6.243229383, 2.293922732), (6.242694465, 2.279075975)],
                knots=[0, 0, 0, 0, 1.078082589, 2.061974896, 3.011033917, 3.963675658, 4.914590949, 5.879605178, 6.895838403, 8, 8, 8, 8], degree=3))
        make_face(mode=Mode.SUBTRACT)
        with BuildLine():
            add(Edge.make_bspline(
                [(6.196540619, 1.517176936), (6.196730477, 1.505629296), (6.197099128, 1.483207057), (6.20046304, 1.450559294), (6.205649554, 1.419730372), (6.21375861, 1.391003719), (6.223316031, 1.363907928), (6.235714339, 1.339167945), (6.249793304, 1.316020987), (6.266412851, 1.295211256), (6.28472227, 1.276705394), (6.303924475, 1.260084604), (6.324524838, 1.246535242), (6.346046028, 1.235062063), (6.368845981, 1.226421032), (6.392712607, 1.220489591), (6.41753513, 1.216100982), (6.434500999, 1.215858569), (6.443175234, 1.215734629)],
                knots=[0, 0, 0, 0, 1.266244622, 2.458687606, 3.596609786, 4.690452447, 5.728949622, 6.743059962, 7.719893583, 8.695837149, 9.65607124, 10.572687906, 11.475837526, 12.354503287, 13.243297811, 14.141816854, 15.049956288, 16, 16, 16, 16], degree=3))
            add(Edge.make_bspline(
                [(6.443175234, 1.215734629), (6.451602181, 1.215902824), (6.468057847, 1.216231266), (6.492249091, 1.219984617), (6.515274313, 1.226176747), (6.537422773, 1.234309167), (6.558086812, 1.245374324), (6.577789165, 1.258506963), (6.596578489, 1.273920235), (6.613783635, 1.292116571), (6.62981085, 1.312188806), (6.643411897, 1.33485558), (6.65555564, 1.35931889), (6.66456557, 1.386236104), (6.67253431, 1.414913473), (6.677108469, 1.44591441), (6.680631417, 1.478875262), (6.68097771, 1.501540921), (6.681156004, 1.51321059)],
                knots=[0, 0, 0, 0, 0.942317584, 1.840104704, 2.730710625, 3.607499931, 4.473808274, 5.346669015, 6.254175223, 7.186360584, 8.144194921, 9.122212144, 10.13877185, 11.193666142, 12.293061794, 13.46493029, 14.694790812, 16, 16, 16, 16], degree=3))
            add(Edge.make_bspline(
                [(6.681156004, 1.51321059), (6.680957439, 1.523435783), (6.680568608, 1.543458845), (6.677255041, 1.572763282), (6.671879045, 1.600628764), (6.664397898, 1.626985973), (6.654573048, 1.6515499), (6.642928518, 1.674710577), (6.628949814, 1.696276432), (6.612613113, 1.715977787), (6.595156277, 1.734014144), (6.576153606, 1.749704056), (6.556004184, 1.763065709), (6.534599532, 1.773990125), (6.512031704, 1.782228962), (6.488523892, 1.78844843), (6.463726194, 1.792153595), (6.446793708, 1.792487039), (6.438127157, 1.792657706)],
                knots=[0, 0, 0, 0, 1.18097333, 2.312592441, 3.401847494, 4.45657129, 5.472467779, 6.453609222, 7.447247299, 8.433973197, 9.406033457, 10.342947316, 11.274909381, 12.193955836, 13.112162788, 14.045055317, 14.999401151, 16, 16, 16, 16], degree=3))
            add(Edge.make_bspline(
                [(6.438127157, 1.792657706), (6.428259379, 1.792365239), (6.40916153, 1.791799208), (6.381426866, 1.787876586), (6.355713318, 1.780917675), (6.331705458, 1.771700183), (6.309770612, 1.759227348), (6.289908926, 1.74391846), (6.271697391, 1.726251639), (6.250860821, 1.699090969), (6.229093216, 1.662568124), (6.210711059, 1.615600245), (6.198388998, 1.567087579), (6.197157628, 1.533837656), (6.196540619, 1.517176936)],
                knots=[0, 0, 0, 0, 0.864439711, 1.673014741, 2.446909759, 3.19383146, 3.919980361, 4.648644137, 5.385779273, 6.135663785, 7.641703236, 9.092511638, 10.543128981, 12, 12, 12, 12], degree=3))
        make_face(mode=Mode.SUBTRACT)
    extrude(amount=-CUT_EXTRUDE5_DEPTH, mode=Mode.SUBTRACT)


solid = part.part
